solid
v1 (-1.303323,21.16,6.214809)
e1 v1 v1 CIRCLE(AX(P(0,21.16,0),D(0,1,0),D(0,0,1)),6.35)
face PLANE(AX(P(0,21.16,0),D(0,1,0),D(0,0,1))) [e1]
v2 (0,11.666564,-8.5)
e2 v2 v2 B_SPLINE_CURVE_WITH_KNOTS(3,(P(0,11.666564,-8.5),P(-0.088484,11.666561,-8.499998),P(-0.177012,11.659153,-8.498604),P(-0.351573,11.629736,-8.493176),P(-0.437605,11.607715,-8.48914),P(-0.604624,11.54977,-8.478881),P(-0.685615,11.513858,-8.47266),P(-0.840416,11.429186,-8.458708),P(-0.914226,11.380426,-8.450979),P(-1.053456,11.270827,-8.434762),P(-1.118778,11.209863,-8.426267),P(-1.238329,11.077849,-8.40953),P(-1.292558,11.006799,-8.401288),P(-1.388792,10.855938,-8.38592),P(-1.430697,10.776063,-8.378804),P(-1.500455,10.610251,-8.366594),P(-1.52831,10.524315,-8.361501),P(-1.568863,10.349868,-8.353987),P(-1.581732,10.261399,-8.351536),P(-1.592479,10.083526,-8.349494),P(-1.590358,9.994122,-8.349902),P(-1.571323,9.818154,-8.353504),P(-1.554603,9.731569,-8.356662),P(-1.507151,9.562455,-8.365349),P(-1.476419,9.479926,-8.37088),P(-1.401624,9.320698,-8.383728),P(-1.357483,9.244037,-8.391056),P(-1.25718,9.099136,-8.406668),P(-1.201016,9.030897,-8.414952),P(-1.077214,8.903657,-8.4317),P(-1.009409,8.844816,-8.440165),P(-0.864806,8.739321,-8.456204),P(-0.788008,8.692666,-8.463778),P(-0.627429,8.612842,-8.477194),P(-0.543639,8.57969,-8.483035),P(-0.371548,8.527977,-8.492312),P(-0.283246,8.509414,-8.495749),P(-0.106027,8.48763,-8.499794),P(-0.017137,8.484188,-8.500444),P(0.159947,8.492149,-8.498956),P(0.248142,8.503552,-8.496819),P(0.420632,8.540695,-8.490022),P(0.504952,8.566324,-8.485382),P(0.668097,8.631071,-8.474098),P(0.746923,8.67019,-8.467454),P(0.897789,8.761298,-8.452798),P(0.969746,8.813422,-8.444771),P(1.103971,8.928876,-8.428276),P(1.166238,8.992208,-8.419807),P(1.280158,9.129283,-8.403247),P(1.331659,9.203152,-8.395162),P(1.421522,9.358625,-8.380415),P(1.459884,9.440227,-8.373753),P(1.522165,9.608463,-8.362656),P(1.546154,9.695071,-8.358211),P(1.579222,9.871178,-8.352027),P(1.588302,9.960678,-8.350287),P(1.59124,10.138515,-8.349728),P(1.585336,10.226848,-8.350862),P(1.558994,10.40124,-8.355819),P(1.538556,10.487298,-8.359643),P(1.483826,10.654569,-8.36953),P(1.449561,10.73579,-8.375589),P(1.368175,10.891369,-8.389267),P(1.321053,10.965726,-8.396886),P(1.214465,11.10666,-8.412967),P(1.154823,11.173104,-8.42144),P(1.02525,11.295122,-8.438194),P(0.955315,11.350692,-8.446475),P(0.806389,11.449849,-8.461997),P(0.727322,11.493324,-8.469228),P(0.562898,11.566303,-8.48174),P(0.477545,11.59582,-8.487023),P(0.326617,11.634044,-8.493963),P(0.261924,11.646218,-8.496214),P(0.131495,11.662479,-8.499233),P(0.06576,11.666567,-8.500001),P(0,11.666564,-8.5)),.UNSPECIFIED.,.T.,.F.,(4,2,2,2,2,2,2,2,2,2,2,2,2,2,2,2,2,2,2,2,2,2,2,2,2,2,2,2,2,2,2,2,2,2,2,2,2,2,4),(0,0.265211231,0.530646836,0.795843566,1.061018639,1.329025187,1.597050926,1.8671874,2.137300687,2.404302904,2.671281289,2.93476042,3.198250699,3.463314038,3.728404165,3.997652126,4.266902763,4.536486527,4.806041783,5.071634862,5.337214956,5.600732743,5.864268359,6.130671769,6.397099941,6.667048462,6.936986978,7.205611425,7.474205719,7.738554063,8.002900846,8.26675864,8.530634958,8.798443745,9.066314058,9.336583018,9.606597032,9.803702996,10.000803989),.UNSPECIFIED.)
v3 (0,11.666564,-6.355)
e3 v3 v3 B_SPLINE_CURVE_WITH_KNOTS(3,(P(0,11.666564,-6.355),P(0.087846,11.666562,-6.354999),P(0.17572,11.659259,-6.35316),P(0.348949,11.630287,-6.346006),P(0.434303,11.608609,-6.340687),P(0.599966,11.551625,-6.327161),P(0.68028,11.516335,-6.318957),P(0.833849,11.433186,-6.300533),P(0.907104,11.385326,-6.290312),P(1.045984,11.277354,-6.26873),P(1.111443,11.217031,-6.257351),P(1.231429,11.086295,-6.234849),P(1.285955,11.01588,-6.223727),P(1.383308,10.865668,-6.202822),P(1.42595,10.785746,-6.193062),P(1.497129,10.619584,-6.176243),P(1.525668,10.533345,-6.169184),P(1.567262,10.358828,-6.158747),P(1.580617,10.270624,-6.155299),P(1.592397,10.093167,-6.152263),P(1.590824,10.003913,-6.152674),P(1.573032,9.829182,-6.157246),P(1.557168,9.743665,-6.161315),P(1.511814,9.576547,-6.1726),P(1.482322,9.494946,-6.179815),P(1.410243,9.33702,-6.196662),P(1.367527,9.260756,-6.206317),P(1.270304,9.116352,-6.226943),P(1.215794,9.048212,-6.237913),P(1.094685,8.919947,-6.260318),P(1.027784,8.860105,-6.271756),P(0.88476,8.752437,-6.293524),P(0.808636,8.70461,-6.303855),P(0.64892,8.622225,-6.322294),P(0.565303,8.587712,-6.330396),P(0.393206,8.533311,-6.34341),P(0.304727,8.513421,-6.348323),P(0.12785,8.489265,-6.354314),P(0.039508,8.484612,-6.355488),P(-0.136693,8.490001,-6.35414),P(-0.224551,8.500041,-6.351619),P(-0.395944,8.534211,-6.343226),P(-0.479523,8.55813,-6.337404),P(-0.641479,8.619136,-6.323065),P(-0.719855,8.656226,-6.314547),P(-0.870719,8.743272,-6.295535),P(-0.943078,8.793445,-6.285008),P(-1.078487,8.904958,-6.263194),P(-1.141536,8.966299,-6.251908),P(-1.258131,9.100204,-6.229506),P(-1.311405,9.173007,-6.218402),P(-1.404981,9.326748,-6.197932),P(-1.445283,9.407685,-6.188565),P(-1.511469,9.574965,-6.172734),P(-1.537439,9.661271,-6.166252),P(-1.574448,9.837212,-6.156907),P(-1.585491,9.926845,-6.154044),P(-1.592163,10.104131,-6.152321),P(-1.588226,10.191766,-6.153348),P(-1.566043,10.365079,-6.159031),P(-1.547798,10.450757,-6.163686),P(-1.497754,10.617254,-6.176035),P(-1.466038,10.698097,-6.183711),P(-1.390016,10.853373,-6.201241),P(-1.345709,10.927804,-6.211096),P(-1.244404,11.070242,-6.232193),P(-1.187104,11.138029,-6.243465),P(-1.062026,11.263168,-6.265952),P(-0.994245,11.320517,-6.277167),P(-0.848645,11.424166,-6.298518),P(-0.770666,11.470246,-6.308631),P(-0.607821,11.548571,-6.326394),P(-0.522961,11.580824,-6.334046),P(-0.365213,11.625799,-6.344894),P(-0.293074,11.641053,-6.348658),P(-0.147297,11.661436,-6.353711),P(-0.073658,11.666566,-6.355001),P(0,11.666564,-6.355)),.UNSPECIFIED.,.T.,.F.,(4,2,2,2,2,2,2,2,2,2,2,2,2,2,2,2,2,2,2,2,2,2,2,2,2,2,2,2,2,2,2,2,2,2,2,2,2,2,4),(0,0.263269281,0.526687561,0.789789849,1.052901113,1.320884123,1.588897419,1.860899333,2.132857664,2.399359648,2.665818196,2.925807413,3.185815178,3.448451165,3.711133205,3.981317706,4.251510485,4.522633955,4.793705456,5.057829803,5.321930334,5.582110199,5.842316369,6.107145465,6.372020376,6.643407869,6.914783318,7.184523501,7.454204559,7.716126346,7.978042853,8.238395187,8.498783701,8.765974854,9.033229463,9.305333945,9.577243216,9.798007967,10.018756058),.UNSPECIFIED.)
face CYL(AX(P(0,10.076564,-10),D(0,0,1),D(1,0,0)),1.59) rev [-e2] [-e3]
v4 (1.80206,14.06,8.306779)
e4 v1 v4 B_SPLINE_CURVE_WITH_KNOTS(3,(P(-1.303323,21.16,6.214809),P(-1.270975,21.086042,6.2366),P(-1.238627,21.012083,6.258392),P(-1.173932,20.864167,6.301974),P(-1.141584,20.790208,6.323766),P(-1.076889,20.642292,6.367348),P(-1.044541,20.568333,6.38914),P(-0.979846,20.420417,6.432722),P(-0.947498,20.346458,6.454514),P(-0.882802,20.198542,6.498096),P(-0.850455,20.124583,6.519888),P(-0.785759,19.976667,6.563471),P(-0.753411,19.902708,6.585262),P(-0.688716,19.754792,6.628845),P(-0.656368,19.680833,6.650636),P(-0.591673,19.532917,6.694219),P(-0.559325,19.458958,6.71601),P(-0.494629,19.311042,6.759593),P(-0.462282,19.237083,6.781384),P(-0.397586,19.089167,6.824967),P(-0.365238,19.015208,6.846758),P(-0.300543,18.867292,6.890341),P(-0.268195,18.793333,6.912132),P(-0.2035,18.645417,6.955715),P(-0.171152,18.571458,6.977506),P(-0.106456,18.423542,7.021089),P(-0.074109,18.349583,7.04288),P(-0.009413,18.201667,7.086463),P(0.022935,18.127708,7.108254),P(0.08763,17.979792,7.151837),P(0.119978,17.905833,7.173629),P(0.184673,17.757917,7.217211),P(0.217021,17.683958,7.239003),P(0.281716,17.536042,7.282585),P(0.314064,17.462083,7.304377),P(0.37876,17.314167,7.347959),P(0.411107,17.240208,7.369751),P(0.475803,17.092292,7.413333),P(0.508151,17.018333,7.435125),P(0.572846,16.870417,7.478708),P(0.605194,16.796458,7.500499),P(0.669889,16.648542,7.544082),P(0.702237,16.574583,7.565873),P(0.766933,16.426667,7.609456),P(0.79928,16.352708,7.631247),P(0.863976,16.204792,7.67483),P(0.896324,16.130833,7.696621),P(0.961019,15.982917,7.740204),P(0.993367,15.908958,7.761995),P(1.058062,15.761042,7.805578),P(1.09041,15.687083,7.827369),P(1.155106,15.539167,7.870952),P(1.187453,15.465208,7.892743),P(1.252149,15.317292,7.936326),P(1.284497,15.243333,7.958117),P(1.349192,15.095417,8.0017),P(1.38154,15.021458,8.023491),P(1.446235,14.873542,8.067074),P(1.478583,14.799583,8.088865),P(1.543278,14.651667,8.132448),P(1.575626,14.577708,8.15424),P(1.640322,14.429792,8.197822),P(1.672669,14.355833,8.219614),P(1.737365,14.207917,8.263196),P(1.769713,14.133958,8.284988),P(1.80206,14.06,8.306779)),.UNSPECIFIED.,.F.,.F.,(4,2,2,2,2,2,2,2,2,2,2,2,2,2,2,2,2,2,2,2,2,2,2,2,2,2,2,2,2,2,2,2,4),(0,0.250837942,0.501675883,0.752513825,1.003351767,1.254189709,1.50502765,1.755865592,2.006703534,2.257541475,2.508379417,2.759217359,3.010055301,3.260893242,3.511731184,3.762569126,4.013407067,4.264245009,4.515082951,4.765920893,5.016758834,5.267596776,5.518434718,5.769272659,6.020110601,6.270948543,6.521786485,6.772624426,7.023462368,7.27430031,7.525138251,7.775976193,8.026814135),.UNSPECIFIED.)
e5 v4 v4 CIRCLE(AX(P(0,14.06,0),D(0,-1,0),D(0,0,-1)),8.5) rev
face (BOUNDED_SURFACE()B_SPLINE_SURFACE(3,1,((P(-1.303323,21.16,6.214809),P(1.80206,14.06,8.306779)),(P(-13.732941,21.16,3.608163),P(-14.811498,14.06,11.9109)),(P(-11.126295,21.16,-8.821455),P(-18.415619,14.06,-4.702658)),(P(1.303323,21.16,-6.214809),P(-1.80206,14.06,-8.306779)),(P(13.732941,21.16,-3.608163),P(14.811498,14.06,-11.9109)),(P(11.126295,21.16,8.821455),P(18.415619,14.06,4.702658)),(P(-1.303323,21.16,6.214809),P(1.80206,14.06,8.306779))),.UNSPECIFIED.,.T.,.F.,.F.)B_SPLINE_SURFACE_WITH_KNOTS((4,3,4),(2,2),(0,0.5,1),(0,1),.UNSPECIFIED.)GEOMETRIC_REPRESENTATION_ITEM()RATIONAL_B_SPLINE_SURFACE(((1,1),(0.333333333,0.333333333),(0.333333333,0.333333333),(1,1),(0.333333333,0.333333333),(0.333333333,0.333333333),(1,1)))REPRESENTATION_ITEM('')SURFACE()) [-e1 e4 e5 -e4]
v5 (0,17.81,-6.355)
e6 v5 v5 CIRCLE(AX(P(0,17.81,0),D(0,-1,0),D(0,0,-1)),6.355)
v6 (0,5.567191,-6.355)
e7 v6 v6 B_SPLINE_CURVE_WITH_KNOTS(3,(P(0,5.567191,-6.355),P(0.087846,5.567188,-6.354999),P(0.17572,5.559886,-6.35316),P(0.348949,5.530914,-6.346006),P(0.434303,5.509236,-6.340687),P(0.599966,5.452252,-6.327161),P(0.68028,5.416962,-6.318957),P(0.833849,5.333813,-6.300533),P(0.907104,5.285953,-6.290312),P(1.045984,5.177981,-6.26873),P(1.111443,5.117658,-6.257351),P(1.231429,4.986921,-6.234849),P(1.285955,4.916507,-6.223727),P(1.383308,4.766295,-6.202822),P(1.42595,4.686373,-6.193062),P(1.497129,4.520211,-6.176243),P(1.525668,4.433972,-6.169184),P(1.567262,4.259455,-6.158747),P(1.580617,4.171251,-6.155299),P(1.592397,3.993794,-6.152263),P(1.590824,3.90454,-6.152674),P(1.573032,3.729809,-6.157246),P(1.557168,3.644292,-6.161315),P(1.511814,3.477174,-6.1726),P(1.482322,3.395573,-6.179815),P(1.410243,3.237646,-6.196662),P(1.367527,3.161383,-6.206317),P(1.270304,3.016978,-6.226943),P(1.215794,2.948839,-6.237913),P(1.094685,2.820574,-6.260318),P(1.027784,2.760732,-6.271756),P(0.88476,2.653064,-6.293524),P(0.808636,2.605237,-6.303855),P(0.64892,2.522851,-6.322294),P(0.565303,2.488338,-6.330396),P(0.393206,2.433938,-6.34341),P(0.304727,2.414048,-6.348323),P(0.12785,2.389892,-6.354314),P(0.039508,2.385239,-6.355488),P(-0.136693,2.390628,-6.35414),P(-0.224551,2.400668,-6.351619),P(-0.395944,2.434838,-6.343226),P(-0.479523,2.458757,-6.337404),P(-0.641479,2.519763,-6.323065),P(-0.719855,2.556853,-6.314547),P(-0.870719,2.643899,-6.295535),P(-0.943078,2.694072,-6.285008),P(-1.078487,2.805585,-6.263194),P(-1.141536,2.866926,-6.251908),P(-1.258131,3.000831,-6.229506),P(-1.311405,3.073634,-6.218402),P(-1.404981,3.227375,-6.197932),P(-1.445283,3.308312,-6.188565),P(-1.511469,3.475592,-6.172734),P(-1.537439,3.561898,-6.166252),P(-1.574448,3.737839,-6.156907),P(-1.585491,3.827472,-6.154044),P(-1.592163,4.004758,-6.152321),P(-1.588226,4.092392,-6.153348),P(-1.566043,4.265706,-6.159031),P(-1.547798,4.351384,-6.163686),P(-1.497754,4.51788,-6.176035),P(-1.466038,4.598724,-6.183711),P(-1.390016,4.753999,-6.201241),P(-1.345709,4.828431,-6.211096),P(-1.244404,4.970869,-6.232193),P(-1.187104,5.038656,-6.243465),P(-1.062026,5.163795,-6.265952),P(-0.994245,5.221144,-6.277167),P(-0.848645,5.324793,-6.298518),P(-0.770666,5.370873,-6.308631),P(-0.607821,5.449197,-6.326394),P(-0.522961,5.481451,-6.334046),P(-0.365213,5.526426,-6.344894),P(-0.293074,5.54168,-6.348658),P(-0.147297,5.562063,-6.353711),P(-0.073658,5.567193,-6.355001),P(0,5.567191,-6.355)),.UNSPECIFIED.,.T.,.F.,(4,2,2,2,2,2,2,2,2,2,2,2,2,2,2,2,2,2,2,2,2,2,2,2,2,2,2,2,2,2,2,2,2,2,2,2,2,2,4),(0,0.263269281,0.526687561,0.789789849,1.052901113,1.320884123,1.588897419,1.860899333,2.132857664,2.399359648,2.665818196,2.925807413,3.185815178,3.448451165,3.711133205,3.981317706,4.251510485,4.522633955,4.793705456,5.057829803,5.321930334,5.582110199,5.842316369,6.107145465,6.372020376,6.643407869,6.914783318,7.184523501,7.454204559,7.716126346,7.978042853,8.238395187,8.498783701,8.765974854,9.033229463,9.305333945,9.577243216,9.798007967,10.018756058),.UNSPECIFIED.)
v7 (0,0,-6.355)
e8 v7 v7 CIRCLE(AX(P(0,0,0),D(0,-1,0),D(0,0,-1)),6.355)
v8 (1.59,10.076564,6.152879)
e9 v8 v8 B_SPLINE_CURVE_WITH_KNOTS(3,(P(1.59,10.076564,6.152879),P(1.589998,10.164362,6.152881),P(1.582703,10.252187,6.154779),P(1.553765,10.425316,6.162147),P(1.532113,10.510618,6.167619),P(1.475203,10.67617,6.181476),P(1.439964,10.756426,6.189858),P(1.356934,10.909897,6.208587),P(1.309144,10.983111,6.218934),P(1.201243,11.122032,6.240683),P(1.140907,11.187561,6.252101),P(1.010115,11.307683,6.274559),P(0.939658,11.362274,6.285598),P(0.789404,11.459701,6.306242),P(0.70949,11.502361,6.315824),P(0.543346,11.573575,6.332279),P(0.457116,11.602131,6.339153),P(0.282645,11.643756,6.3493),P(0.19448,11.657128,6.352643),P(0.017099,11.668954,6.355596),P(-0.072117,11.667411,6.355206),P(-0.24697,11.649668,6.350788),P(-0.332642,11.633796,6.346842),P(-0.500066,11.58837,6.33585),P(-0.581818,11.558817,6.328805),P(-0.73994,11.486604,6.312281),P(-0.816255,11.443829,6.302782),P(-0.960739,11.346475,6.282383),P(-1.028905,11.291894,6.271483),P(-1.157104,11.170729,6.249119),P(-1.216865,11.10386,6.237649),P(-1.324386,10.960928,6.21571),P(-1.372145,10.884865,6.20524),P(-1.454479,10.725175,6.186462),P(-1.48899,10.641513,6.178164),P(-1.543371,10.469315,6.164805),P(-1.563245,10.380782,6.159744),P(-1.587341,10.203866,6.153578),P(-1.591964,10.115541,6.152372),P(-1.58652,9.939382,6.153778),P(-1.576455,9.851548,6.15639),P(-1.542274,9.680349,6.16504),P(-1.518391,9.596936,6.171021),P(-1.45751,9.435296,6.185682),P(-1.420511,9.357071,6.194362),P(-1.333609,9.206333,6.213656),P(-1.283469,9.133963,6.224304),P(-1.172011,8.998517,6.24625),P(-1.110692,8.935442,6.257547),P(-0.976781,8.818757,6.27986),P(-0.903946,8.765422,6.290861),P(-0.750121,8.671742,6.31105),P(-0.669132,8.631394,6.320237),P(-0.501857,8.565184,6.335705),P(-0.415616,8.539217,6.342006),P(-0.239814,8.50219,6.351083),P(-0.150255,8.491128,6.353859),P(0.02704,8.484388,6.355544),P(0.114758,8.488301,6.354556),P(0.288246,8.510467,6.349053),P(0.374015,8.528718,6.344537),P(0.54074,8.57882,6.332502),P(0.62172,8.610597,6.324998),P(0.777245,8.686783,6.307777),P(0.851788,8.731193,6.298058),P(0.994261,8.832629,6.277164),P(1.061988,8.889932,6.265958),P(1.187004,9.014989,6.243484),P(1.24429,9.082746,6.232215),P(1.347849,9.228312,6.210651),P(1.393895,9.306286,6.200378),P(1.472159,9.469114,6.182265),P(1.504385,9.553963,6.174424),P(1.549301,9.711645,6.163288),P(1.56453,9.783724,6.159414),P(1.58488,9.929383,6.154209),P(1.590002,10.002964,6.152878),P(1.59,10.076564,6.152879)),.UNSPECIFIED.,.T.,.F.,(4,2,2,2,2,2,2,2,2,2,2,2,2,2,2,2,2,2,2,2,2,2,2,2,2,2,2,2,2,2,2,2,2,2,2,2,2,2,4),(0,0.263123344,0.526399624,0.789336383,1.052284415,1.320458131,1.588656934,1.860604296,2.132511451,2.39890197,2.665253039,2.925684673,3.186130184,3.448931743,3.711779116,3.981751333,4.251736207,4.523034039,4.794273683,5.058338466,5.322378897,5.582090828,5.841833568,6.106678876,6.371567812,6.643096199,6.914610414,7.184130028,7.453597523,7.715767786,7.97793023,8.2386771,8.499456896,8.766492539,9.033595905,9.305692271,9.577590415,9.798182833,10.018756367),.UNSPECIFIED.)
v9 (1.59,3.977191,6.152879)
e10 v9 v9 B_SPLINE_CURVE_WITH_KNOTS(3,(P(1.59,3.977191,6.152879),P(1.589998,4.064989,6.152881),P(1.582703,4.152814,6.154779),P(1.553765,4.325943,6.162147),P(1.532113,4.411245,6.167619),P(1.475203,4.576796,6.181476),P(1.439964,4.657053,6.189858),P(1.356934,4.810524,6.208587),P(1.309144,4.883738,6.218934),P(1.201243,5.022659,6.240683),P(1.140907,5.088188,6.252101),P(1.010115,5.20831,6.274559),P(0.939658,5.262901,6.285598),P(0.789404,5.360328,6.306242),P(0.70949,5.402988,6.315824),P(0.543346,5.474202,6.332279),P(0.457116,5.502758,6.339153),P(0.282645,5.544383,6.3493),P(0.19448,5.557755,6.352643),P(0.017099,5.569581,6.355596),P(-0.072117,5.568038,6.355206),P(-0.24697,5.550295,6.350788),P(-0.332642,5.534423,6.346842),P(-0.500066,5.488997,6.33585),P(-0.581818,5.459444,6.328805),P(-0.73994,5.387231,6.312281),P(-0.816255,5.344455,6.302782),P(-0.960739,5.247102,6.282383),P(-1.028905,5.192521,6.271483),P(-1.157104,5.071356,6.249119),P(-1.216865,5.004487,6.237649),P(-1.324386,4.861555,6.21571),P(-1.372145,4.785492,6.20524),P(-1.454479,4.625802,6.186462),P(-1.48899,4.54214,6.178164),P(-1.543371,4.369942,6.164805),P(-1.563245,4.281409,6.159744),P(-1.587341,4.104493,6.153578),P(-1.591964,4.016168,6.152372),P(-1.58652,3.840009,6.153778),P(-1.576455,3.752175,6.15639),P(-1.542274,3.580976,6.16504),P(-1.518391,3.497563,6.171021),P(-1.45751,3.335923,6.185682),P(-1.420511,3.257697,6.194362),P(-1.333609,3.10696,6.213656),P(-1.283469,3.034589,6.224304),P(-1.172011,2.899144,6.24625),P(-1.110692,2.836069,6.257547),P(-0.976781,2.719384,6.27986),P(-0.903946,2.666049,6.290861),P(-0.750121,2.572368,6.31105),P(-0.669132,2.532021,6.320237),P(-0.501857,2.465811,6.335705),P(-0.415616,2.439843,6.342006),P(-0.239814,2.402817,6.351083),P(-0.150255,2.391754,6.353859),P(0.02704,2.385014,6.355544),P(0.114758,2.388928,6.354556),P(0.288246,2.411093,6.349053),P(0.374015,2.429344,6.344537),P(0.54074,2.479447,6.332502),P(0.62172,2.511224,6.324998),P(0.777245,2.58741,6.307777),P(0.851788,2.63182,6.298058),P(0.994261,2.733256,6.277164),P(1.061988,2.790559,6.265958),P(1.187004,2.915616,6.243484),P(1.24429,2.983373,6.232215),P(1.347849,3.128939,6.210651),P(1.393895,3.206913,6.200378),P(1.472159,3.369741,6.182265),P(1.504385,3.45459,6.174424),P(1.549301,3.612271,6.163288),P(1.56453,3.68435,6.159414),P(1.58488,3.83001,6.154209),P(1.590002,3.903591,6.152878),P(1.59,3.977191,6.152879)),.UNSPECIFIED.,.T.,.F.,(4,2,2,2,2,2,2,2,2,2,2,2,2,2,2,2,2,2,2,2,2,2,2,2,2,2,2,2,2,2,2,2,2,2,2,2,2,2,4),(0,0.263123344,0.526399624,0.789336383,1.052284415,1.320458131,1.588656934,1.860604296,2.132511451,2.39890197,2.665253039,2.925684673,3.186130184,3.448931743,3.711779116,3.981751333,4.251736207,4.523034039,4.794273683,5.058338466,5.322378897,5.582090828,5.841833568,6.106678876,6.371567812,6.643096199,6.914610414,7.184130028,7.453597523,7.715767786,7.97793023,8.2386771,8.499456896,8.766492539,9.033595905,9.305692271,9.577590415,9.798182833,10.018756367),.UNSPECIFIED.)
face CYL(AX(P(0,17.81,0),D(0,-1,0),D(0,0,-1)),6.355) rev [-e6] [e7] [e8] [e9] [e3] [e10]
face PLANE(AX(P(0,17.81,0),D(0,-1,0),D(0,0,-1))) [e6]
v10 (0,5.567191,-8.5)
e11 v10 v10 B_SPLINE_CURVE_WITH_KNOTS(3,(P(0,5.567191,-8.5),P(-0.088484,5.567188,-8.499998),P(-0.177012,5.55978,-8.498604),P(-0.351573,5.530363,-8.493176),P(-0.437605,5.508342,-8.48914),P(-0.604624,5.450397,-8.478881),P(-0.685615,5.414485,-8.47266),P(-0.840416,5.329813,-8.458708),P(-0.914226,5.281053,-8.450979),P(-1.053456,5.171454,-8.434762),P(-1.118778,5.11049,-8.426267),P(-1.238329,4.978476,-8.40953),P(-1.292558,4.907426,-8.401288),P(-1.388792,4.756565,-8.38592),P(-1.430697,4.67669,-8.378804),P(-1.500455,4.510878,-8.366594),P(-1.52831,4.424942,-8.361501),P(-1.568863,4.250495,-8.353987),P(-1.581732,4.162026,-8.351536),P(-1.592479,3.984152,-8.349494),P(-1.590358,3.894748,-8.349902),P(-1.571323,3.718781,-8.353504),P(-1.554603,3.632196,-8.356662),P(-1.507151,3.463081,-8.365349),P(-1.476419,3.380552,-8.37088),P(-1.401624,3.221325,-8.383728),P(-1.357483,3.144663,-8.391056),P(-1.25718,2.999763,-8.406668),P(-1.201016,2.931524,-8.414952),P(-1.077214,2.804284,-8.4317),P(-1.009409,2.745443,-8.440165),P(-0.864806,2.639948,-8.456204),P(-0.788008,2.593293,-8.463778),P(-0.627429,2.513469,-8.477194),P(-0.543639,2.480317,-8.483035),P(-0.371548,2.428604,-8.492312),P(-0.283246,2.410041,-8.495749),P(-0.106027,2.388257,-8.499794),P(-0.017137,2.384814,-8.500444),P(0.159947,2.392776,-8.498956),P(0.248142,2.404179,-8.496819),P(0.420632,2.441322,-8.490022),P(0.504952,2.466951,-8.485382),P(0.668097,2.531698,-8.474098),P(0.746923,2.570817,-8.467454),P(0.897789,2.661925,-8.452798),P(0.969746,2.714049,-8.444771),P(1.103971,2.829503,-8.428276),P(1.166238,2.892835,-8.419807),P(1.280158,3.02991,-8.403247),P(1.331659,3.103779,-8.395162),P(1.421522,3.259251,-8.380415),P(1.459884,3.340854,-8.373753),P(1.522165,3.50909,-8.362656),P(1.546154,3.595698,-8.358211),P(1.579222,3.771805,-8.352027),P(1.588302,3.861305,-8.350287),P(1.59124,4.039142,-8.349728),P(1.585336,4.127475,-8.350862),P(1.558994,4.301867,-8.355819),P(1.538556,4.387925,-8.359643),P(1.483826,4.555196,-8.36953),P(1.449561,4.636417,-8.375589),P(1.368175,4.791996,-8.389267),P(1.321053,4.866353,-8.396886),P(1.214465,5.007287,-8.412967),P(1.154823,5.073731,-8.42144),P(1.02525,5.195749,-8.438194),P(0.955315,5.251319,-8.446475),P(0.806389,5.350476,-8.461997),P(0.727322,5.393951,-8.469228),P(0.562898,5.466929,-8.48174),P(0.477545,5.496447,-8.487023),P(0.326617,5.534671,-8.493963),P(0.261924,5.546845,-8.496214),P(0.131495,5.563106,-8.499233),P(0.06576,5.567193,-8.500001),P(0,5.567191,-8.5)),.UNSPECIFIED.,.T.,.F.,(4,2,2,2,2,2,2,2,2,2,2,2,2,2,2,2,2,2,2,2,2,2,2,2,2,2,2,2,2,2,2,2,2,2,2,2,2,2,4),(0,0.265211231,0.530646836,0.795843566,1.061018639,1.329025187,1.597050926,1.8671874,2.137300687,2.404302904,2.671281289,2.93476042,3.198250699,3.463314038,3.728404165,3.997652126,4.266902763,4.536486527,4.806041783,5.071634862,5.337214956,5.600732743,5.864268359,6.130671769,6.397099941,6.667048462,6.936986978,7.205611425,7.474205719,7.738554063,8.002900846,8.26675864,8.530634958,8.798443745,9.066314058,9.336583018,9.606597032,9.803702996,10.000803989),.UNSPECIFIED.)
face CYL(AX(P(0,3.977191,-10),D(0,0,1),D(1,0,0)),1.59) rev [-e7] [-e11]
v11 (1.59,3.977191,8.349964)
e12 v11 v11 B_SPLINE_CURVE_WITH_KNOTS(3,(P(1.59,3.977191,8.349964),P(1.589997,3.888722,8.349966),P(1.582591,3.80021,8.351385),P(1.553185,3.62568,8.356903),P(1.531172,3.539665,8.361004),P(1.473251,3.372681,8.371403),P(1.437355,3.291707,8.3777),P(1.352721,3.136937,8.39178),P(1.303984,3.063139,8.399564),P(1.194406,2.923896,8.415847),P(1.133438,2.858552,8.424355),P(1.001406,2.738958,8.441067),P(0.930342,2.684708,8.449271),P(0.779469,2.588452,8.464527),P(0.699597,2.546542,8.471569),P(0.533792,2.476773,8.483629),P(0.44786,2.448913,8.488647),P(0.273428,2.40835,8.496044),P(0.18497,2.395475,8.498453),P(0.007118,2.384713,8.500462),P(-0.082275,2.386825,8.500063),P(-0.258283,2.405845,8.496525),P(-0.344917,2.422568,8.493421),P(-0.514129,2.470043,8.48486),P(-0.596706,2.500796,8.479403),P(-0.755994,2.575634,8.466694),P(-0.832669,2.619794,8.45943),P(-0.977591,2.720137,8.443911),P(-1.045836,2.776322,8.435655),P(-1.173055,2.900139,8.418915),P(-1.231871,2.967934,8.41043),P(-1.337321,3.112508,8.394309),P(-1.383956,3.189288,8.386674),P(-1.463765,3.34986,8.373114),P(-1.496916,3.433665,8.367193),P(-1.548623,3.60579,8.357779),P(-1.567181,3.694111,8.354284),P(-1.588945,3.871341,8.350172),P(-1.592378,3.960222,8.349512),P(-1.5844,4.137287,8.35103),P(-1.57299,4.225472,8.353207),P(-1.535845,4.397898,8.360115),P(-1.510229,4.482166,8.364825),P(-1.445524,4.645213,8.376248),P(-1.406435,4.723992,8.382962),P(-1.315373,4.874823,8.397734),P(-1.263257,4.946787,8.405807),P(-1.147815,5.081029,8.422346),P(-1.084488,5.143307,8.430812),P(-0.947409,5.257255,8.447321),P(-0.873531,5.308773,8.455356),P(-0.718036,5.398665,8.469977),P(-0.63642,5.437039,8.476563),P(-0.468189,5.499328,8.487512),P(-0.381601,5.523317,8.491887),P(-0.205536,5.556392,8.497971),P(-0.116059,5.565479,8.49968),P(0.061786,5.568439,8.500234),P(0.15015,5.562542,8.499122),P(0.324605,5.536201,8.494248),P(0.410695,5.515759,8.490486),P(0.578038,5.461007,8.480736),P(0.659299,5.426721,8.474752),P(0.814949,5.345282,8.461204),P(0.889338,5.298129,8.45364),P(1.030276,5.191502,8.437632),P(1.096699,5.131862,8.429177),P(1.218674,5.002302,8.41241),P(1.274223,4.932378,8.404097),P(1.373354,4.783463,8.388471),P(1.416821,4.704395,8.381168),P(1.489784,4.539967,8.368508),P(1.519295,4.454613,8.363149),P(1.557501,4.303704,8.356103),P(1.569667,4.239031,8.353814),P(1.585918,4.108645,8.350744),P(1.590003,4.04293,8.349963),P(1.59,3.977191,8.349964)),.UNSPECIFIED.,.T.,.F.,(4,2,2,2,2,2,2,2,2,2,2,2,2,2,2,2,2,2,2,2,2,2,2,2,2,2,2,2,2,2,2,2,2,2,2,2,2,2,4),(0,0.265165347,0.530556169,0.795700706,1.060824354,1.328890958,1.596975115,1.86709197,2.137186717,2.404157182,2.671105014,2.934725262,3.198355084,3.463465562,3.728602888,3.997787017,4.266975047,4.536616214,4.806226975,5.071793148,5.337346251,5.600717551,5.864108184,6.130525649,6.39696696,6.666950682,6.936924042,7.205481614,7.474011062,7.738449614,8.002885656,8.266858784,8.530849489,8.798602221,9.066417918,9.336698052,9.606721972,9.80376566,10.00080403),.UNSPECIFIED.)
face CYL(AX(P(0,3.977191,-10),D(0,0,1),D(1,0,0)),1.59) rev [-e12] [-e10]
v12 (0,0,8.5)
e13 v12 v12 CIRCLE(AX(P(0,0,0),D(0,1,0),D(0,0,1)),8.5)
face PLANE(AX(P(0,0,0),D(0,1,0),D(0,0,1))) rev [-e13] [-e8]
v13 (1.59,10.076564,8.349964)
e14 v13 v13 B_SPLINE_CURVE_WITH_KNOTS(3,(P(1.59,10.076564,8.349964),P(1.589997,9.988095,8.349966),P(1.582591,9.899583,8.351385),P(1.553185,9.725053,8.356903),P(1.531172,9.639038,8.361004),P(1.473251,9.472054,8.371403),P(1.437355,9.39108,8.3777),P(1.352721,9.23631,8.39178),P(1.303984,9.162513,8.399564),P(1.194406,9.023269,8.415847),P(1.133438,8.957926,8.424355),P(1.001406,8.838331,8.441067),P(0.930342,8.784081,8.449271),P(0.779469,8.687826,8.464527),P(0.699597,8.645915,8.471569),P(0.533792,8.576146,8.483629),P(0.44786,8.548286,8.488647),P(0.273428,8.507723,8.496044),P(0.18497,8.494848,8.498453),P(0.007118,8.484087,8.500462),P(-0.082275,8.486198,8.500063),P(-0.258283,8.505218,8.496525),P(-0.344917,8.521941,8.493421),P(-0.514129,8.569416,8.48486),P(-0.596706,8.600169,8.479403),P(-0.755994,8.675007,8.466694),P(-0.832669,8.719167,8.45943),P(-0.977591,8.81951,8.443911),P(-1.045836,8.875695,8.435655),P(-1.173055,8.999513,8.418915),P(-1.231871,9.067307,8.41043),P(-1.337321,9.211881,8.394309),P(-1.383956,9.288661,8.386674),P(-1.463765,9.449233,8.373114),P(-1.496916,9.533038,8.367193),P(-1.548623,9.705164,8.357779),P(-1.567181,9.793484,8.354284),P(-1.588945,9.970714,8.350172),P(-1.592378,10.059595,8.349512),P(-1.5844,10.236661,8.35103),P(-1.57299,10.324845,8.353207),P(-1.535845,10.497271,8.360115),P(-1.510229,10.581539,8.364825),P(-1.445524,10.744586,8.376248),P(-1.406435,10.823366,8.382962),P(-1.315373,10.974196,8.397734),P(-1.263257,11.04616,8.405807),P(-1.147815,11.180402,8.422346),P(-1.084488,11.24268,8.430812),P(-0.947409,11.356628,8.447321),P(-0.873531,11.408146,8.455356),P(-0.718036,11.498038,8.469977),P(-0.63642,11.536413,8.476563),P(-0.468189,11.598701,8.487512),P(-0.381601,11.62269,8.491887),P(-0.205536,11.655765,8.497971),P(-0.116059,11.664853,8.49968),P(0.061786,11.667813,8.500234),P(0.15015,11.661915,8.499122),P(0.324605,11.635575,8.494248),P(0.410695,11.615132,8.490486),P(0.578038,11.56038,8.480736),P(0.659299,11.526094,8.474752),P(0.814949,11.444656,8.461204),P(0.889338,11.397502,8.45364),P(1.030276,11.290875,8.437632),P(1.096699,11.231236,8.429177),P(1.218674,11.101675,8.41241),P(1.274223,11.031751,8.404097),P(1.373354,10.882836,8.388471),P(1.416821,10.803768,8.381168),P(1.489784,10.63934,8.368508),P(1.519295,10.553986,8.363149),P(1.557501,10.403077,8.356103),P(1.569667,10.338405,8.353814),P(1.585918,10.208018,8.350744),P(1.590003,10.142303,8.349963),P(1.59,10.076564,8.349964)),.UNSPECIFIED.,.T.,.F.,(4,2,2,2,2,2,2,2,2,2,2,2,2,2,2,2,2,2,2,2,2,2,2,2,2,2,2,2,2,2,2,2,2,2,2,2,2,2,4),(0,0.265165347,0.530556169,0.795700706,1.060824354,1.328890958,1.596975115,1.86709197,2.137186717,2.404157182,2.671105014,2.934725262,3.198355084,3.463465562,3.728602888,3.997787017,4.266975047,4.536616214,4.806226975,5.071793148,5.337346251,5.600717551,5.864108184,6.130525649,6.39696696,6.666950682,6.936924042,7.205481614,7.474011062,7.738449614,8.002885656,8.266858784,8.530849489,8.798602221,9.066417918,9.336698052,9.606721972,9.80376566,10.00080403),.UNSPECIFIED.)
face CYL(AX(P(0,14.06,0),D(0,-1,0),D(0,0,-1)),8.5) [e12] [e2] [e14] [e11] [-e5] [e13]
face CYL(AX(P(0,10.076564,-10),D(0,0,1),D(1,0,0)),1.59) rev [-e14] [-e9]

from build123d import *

# Parameters (mm, degrees)
SKETCH1_R           = 8.5
BOSS_EXTRUDE1_DEPTH = 14.06
SKETCH4_R           = 6.355
CUT_EXTRUDE5_DEPTH  = 17.81
SKETCH5_R           = 1.59
CUT_EXTRUDE6_DEPTH  = 10


with BuildPart() as part:
    # Sketch1 → Boss-Extrude1 (new body)
    with BuildSketch(Plane(origin=(0, 0, 0), x_dir=(1, 0, 0), z_dir=(0, 1, 0))):
        with Locations(Location((0, 0, 0), (0, 0, 270))):
            Circle(SKETCH1_R)
    extrude(amount=BOSS_EXTRUDE1_DEPTH)

    # Loft1: read off the stored shape, not the designer's step
    # Loft1: loft between two sections, ruled curve by curve
    loft1_from = [
        Edge.make_bspline([(-1.303322944, 21.16, 6.214808871), (-13.732940686, 21.16, 3.608162984), (-11.126294799, 21.16, -8.821454758), (1.303322944, 21.16, -6.214808871), (13.732940686, 21.16, -3.608162984), (11.126294799, 21.16, 8.821454758), (-1.303322944, 21.16, 6.214808871)], [0, 0, 0, 0, 0.5, 0.5, 0.5, 1, 1, 1, 1], 3, [1, 0.333333333, 0.333333333, 1, 0.333333333, 0.333333333, 1]),
    ]
    loft1_to = [
        Edge.make_bspline([(1.802060434, 14.06, 8.30677905), (-14.811497666, 14.06, 11.910899919), (-18.415618535, 14.06, -4.702658182), (-1.802060434, 14.06, -8.30677905), (14.811497666, 14.06, -11.910899919), (18.415618535, 14.06, 4.702658182), (1.802060434, 14.06, 8.30677905)], [0, 0, 0, 0, 0.5, 0.5, 0.5, 1, 1, 1, 1], 3, [1, 0.333333333, 0.333333333, 1, 0.333333333, 0.333333333, 1]),
    ]
    loft1 = Solid(Shell([*[Face.make_surface_from_curves(loft1_from[k], loft1_to[k]) for k in range(1)], Face(Wire(loft1_from)), Face(Wire(loft1_to))]))
    add(loft1)

    # Sketch4 → Cut-Extrude5 (cut)
    with BuildSketch(Plane.XZ):
        with Locations(Location((0, 0, 0), (0, 0, 270))):
            Circle(SKETCH4_R)
    extrude(amount=-CUT_EXTRUDE5_DEPTH, mode=Mode.SUBTRACT)

    # Sketch5 → Cut-Extrude6 (cut, symmetric)
    with BuildSketch(Plane.XY):
        with Locations((0, 10.076564013)):
            Circle(SKETCH5_R)
        with Locations((0, 3.977190907)):
            Circle(SKETCH5_R)
    extrude(amount=CUT_EXTRUDE6_DEPTH, both=True, mode=Mode.SUBTRACT)


solid = part.part
